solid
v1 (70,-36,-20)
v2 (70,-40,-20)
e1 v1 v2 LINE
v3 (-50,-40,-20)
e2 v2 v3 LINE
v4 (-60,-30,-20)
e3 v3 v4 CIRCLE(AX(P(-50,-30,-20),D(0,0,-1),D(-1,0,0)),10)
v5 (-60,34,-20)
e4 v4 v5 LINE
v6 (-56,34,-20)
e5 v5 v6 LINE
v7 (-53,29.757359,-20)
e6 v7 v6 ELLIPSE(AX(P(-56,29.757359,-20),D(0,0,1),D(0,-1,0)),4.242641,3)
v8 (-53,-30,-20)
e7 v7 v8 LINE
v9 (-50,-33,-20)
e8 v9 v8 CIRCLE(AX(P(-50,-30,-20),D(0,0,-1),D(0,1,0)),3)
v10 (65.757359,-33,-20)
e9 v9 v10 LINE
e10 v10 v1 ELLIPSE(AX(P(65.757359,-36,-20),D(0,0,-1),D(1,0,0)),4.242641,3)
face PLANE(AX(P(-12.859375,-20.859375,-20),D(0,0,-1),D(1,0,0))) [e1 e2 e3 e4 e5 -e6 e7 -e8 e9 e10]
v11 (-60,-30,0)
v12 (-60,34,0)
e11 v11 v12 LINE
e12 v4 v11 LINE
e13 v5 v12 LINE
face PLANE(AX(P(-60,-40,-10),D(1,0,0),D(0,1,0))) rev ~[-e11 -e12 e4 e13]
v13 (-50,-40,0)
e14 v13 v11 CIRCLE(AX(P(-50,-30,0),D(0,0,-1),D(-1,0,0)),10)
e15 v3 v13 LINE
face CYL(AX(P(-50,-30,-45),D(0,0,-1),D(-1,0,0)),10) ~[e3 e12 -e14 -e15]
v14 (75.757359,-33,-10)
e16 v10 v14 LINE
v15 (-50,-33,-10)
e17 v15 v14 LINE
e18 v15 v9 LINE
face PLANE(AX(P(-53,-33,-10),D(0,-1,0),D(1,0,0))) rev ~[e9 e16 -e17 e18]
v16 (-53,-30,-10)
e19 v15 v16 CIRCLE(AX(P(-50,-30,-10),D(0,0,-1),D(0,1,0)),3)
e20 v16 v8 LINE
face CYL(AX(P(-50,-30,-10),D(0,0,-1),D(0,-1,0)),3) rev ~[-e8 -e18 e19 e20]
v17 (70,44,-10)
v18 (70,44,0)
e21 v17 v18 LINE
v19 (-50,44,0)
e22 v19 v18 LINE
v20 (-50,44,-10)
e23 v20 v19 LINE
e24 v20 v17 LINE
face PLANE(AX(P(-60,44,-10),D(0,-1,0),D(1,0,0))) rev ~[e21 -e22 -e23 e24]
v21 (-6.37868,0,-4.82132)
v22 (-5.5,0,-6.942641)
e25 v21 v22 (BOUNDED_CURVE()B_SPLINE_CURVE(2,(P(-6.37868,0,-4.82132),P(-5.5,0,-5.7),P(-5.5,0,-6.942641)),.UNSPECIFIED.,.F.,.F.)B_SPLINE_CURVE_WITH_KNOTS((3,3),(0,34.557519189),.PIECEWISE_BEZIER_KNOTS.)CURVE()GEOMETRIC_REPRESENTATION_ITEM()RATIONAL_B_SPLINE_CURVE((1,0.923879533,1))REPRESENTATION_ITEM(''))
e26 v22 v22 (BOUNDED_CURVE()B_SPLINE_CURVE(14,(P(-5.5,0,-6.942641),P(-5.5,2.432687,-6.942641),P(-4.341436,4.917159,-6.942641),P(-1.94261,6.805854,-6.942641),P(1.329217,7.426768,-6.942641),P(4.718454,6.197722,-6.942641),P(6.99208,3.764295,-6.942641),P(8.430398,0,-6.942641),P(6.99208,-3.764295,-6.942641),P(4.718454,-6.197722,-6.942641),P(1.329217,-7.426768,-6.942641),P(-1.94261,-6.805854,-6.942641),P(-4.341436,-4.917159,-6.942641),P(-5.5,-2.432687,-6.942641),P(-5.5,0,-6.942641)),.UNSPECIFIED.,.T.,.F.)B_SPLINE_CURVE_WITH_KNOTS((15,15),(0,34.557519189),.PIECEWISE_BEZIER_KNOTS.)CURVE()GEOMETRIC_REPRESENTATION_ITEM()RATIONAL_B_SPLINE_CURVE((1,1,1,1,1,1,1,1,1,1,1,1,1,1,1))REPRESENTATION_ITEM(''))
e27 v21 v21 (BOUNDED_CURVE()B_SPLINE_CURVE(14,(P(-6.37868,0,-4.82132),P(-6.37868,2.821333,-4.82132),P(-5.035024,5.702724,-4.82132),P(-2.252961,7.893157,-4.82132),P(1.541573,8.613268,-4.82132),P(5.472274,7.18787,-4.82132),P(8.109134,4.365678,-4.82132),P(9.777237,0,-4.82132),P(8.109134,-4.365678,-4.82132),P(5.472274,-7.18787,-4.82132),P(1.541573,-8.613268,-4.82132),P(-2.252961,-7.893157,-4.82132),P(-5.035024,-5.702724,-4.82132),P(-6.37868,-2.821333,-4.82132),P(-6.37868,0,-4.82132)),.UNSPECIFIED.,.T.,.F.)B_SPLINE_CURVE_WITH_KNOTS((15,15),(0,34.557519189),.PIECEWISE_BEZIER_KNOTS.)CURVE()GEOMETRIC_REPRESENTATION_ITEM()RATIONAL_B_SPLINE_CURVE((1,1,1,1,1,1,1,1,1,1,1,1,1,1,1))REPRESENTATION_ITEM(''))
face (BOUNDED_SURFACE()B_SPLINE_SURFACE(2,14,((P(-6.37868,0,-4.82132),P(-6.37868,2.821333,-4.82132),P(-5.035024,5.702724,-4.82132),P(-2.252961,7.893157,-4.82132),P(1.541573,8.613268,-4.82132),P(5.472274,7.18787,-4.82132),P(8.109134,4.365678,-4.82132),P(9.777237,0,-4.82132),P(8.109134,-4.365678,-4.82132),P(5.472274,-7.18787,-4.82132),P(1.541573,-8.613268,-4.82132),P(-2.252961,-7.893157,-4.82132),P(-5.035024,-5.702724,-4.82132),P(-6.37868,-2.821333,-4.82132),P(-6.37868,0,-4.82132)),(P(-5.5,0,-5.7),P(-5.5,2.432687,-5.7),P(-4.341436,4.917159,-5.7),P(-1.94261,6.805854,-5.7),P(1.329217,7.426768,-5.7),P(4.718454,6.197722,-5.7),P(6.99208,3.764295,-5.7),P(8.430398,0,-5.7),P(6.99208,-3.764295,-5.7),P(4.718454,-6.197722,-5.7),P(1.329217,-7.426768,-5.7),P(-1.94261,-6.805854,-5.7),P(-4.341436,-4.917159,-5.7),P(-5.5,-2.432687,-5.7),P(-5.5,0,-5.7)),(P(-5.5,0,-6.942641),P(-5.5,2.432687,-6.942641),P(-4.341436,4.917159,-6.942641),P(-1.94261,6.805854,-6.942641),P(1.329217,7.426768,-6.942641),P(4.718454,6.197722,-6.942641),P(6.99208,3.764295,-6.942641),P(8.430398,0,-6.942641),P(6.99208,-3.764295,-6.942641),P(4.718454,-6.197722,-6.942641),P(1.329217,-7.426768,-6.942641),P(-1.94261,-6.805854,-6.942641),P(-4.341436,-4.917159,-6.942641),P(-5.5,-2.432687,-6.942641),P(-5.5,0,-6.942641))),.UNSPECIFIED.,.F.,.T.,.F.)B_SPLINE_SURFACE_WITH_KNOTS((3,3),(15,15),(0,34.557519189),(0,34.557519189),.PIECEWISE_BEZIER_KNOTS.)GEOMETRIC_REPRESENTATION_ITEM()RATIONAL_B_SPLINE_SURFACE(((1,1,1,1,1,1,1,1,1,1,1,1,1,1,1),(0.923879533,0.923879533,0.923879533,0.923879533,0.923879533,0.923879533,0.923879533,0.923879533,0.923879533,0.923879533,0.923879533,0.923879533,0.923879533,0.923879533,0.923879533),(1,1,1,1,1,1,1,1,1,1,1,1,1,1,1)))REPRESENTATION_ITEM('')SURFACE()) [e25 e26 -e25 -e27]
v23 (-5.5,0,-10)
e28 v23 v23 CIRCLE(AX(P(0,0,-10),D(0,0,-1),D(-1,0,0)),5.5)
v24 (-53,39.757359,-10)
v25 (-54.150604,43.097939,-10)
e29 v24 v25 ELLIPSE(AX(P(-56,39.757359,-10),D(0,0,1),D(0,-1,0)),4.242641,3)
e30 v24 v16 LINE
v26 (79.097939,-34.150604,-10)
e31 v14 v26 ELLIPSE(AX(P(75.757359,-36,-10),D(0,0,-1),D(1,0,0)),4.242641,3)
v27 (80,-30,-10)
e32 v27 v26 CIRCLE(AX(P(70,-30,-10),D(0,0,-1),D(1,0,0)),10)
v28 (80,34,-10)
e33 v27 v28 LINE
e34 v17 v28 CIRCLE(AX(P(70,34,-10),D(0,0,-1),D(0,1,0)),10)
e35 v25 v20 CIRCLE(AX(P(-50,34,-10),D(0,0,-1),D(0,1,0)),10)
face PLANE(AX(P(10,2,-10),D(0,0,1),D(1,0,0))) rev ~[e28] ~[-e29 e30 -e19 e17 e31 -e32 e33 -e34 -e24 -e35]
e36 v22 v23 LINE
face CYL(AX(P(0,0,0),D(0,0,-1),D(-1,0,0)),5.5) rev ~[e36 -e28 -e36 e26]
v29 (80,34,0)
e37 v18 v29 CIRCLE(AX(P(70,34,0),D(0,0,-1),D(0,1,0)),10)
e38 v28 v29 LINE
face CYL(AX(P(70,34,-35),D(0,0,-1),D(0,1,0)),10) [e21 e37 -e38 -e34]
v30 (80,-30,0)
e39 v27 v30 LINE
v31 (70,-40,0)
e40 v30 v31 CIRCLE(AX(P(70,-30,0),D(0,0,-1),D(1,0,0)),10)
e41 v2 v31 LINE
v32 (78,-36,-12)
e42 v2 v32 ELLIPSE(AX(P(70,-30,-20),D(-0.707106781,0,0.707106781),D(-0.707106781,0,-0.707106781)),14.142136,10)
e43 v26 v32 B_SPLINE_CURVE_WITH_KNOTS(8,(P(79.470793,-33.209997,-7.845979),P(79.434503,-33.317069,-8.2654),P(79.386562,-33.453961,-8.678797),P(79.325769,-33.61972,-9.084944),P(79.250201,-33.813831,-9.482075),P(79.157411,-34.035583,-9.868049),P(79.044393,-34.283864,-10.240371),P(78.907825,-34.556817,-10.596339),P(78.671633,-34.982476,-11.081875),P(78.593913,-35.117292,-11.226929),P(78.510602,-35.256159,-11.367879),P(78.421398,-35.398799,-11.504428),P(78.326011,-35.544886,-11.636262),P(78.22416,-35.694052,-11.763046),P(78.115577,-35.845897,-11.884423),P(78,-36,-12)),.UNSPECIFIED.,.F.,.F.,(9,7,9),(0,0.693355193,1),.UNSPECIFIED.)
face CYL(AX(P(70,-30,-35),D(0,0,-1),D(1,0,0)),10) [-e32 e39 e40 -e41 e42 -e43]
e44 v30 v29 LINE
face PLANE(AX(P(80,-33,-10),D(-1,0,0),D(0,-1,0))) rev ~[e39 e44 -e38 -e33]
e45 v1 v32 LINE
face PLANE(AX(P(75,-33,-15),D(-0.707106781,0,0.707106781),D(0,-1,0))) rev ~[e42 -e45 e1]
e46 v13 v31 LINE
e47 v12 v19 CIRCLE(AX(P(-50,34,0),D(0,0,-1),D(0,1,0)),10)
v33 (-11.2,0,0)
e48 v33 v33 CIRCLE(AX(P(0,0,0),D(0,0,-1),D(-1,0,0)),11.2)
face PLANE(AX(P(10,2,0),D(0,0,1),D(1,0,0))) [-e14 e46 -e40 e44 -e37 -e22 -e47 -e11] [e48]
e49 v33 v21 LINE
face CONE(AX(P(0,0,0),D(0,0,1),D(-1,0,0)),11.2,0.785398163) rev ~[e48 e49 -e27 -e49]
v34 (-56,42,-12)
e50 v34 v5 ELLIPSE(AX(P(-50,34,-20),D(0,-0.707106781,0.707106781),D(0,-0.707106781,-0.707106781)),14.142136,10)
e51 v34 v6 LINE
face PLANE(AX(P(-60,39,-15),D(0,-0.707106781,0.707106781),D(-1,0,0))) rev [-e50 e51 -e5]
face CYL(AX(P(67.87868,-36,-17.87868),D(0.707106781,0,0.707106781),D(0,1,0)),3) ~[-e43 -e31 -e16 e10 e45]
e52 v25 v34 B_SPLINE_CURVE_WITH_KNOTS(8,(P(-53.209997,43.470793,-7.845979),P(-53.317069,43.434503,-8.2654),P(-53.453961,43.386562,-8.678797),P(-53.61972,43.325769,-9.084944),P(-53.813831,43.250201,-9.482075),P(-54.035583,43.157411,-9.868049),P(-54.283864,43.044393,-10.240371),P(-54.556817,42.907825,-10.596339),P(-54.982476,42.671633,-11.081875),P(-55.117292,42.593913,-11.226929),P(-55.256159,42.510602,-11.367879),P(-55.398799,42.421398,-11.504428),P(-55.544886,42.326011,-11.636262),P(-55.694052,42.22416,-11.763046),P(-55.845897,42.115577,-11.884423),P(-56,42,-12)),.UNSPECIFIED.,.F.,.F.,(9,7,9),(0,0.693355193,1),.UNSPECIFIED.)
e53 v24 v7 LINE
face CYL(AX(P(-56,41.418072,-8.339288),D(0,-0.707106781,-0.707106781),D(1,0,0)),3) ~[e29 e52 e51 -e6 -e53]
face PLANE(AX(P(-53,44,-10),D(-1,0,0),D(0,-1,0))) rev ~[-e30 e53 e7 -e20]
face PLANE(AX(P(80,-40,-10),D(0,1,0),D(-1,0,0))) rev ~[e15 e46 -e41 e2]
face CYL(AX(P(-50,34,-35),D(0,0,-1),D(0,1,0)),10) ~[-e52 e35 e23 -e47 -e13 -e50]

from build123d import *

# Parameters (mm, degrees)
F0_W           = 140
F0_H           = 84
F1_DEPTH       = 10
F2_D           = 11
F2_DEPTH       = 30
F2_CSINK_D     = 22.4
F2_CSINK_ANGLE = 90
F2_TIP         = 3.3047334047
F4_DEPTH       = 10
F5_SIZE        = 10
F6_T1_DEPTH    = 70
F6_T3_DEPTH    = 60
F7_R           = 3


# Not quite as in the source:
# - a fillet or chamfer that OpenCascade refuses, or shapes differently, is made with other operations: its cross-section is extruded or revolved along the edge and cut away or added


with BuildPart() as f1:
    # F0 (on Top) → F1 (new body)
    with BuildSketch(Plane.XY):
        with Locations((10, 2)):
            Rectangle(F0_W, F0_H)
    extrude(amount=-F1_DEPTH)

    # F2
    with Locations(Plane.XY):
        with Locations((0, 0)):
            CounterSinkHole(F2_D / 2, F2_CSINK_D / 2, depth=F2_DEPTH, counter_sink_angle=F2_CSINK_ANGLE)
            with Locations((0, 0, -(F2_DEPTH + F2_TIP / 2))):  # 118° drill point
                Cone(0, F2_D / 2, F2_TIP, mode=Mode.SUBTRACT)

    # F3 (on face) → F4 (join)
    with BuildSketch(Plane(origin=(0, 0, -10), x_dir=(1, 0, 0), z_dir=(0, 0, -1))):
        Polygon((80, 40), (-60, 40), (-60, -44), (-53, -44), (-53, 33), (80, 33), align=None)
    extrude(amount=F4_DEPTH)

    # F5
    f5_edges = [f1.edges().sort_by_distance(p)[0] for p in [
        (-56.5, 44, -20),
        (80, -36.5, -20),
    ]]
    chamfer(f5_edges, length=F5_SIZE)

    # F6: fillet of radius 10 on 4 edges, made by hand

    # F6_s2 → F6_t1 (cut)
    with BuildSketch(Plane.XY.offset(-45)):
        with BuildLine():
            ThreePointArc((-60, -30), (-57.0710678119, -37.0710678119), (-50, -40))
            Line((-50, -40), (-60, -40))
            Line((-60, -40), (-60, -30))
        make_face()
    extrude(amount=F6_T1_DEPTH, mode=Mode.SUBTRACT)

    # F6_s4 → F6_t3 (cut)
    with BuildSketch(Plane.XY.offset(-35)):
        with BuildLine():
            ThreePointArc((80, -30), (77.0710678119, -37.0710678119), (70, -40))
            Line((70, -40), (80, -40))
            Line((80, -40), (80, -30))
        make_face()
        with BuildLine():
            ThreePointArc((70, 44), (77.0710678119, 41.0710678119), (80, 34))
            Line((80, 34), (80, 44))
            Line((80, 44), (70, 44))
        make_face()
        with BuildLine():
            ThreePointArc((-50, 44), (-57.0710678119, 41.0710678119), (-60, 34))
            Line((-60, 34), (-60, 44))
            Line((-60, 44), (-50, 44))
        make_face()
    extrude(amount=F6_T3_DEPTH, mode=Mode.SUBTRACT)

    # F7
    f7_edges = [f1.edges().sort_by_distance(p)[0] for p in [
        (-53, -33, -15),
        (-53, 38.769696, -15.230304),
        (74.769696, -33, -15.230304),
        (-5.5, 0, -5.7),
    ]]
    fillet(f7_edges, radius=F7_R)


solid = f1.part
